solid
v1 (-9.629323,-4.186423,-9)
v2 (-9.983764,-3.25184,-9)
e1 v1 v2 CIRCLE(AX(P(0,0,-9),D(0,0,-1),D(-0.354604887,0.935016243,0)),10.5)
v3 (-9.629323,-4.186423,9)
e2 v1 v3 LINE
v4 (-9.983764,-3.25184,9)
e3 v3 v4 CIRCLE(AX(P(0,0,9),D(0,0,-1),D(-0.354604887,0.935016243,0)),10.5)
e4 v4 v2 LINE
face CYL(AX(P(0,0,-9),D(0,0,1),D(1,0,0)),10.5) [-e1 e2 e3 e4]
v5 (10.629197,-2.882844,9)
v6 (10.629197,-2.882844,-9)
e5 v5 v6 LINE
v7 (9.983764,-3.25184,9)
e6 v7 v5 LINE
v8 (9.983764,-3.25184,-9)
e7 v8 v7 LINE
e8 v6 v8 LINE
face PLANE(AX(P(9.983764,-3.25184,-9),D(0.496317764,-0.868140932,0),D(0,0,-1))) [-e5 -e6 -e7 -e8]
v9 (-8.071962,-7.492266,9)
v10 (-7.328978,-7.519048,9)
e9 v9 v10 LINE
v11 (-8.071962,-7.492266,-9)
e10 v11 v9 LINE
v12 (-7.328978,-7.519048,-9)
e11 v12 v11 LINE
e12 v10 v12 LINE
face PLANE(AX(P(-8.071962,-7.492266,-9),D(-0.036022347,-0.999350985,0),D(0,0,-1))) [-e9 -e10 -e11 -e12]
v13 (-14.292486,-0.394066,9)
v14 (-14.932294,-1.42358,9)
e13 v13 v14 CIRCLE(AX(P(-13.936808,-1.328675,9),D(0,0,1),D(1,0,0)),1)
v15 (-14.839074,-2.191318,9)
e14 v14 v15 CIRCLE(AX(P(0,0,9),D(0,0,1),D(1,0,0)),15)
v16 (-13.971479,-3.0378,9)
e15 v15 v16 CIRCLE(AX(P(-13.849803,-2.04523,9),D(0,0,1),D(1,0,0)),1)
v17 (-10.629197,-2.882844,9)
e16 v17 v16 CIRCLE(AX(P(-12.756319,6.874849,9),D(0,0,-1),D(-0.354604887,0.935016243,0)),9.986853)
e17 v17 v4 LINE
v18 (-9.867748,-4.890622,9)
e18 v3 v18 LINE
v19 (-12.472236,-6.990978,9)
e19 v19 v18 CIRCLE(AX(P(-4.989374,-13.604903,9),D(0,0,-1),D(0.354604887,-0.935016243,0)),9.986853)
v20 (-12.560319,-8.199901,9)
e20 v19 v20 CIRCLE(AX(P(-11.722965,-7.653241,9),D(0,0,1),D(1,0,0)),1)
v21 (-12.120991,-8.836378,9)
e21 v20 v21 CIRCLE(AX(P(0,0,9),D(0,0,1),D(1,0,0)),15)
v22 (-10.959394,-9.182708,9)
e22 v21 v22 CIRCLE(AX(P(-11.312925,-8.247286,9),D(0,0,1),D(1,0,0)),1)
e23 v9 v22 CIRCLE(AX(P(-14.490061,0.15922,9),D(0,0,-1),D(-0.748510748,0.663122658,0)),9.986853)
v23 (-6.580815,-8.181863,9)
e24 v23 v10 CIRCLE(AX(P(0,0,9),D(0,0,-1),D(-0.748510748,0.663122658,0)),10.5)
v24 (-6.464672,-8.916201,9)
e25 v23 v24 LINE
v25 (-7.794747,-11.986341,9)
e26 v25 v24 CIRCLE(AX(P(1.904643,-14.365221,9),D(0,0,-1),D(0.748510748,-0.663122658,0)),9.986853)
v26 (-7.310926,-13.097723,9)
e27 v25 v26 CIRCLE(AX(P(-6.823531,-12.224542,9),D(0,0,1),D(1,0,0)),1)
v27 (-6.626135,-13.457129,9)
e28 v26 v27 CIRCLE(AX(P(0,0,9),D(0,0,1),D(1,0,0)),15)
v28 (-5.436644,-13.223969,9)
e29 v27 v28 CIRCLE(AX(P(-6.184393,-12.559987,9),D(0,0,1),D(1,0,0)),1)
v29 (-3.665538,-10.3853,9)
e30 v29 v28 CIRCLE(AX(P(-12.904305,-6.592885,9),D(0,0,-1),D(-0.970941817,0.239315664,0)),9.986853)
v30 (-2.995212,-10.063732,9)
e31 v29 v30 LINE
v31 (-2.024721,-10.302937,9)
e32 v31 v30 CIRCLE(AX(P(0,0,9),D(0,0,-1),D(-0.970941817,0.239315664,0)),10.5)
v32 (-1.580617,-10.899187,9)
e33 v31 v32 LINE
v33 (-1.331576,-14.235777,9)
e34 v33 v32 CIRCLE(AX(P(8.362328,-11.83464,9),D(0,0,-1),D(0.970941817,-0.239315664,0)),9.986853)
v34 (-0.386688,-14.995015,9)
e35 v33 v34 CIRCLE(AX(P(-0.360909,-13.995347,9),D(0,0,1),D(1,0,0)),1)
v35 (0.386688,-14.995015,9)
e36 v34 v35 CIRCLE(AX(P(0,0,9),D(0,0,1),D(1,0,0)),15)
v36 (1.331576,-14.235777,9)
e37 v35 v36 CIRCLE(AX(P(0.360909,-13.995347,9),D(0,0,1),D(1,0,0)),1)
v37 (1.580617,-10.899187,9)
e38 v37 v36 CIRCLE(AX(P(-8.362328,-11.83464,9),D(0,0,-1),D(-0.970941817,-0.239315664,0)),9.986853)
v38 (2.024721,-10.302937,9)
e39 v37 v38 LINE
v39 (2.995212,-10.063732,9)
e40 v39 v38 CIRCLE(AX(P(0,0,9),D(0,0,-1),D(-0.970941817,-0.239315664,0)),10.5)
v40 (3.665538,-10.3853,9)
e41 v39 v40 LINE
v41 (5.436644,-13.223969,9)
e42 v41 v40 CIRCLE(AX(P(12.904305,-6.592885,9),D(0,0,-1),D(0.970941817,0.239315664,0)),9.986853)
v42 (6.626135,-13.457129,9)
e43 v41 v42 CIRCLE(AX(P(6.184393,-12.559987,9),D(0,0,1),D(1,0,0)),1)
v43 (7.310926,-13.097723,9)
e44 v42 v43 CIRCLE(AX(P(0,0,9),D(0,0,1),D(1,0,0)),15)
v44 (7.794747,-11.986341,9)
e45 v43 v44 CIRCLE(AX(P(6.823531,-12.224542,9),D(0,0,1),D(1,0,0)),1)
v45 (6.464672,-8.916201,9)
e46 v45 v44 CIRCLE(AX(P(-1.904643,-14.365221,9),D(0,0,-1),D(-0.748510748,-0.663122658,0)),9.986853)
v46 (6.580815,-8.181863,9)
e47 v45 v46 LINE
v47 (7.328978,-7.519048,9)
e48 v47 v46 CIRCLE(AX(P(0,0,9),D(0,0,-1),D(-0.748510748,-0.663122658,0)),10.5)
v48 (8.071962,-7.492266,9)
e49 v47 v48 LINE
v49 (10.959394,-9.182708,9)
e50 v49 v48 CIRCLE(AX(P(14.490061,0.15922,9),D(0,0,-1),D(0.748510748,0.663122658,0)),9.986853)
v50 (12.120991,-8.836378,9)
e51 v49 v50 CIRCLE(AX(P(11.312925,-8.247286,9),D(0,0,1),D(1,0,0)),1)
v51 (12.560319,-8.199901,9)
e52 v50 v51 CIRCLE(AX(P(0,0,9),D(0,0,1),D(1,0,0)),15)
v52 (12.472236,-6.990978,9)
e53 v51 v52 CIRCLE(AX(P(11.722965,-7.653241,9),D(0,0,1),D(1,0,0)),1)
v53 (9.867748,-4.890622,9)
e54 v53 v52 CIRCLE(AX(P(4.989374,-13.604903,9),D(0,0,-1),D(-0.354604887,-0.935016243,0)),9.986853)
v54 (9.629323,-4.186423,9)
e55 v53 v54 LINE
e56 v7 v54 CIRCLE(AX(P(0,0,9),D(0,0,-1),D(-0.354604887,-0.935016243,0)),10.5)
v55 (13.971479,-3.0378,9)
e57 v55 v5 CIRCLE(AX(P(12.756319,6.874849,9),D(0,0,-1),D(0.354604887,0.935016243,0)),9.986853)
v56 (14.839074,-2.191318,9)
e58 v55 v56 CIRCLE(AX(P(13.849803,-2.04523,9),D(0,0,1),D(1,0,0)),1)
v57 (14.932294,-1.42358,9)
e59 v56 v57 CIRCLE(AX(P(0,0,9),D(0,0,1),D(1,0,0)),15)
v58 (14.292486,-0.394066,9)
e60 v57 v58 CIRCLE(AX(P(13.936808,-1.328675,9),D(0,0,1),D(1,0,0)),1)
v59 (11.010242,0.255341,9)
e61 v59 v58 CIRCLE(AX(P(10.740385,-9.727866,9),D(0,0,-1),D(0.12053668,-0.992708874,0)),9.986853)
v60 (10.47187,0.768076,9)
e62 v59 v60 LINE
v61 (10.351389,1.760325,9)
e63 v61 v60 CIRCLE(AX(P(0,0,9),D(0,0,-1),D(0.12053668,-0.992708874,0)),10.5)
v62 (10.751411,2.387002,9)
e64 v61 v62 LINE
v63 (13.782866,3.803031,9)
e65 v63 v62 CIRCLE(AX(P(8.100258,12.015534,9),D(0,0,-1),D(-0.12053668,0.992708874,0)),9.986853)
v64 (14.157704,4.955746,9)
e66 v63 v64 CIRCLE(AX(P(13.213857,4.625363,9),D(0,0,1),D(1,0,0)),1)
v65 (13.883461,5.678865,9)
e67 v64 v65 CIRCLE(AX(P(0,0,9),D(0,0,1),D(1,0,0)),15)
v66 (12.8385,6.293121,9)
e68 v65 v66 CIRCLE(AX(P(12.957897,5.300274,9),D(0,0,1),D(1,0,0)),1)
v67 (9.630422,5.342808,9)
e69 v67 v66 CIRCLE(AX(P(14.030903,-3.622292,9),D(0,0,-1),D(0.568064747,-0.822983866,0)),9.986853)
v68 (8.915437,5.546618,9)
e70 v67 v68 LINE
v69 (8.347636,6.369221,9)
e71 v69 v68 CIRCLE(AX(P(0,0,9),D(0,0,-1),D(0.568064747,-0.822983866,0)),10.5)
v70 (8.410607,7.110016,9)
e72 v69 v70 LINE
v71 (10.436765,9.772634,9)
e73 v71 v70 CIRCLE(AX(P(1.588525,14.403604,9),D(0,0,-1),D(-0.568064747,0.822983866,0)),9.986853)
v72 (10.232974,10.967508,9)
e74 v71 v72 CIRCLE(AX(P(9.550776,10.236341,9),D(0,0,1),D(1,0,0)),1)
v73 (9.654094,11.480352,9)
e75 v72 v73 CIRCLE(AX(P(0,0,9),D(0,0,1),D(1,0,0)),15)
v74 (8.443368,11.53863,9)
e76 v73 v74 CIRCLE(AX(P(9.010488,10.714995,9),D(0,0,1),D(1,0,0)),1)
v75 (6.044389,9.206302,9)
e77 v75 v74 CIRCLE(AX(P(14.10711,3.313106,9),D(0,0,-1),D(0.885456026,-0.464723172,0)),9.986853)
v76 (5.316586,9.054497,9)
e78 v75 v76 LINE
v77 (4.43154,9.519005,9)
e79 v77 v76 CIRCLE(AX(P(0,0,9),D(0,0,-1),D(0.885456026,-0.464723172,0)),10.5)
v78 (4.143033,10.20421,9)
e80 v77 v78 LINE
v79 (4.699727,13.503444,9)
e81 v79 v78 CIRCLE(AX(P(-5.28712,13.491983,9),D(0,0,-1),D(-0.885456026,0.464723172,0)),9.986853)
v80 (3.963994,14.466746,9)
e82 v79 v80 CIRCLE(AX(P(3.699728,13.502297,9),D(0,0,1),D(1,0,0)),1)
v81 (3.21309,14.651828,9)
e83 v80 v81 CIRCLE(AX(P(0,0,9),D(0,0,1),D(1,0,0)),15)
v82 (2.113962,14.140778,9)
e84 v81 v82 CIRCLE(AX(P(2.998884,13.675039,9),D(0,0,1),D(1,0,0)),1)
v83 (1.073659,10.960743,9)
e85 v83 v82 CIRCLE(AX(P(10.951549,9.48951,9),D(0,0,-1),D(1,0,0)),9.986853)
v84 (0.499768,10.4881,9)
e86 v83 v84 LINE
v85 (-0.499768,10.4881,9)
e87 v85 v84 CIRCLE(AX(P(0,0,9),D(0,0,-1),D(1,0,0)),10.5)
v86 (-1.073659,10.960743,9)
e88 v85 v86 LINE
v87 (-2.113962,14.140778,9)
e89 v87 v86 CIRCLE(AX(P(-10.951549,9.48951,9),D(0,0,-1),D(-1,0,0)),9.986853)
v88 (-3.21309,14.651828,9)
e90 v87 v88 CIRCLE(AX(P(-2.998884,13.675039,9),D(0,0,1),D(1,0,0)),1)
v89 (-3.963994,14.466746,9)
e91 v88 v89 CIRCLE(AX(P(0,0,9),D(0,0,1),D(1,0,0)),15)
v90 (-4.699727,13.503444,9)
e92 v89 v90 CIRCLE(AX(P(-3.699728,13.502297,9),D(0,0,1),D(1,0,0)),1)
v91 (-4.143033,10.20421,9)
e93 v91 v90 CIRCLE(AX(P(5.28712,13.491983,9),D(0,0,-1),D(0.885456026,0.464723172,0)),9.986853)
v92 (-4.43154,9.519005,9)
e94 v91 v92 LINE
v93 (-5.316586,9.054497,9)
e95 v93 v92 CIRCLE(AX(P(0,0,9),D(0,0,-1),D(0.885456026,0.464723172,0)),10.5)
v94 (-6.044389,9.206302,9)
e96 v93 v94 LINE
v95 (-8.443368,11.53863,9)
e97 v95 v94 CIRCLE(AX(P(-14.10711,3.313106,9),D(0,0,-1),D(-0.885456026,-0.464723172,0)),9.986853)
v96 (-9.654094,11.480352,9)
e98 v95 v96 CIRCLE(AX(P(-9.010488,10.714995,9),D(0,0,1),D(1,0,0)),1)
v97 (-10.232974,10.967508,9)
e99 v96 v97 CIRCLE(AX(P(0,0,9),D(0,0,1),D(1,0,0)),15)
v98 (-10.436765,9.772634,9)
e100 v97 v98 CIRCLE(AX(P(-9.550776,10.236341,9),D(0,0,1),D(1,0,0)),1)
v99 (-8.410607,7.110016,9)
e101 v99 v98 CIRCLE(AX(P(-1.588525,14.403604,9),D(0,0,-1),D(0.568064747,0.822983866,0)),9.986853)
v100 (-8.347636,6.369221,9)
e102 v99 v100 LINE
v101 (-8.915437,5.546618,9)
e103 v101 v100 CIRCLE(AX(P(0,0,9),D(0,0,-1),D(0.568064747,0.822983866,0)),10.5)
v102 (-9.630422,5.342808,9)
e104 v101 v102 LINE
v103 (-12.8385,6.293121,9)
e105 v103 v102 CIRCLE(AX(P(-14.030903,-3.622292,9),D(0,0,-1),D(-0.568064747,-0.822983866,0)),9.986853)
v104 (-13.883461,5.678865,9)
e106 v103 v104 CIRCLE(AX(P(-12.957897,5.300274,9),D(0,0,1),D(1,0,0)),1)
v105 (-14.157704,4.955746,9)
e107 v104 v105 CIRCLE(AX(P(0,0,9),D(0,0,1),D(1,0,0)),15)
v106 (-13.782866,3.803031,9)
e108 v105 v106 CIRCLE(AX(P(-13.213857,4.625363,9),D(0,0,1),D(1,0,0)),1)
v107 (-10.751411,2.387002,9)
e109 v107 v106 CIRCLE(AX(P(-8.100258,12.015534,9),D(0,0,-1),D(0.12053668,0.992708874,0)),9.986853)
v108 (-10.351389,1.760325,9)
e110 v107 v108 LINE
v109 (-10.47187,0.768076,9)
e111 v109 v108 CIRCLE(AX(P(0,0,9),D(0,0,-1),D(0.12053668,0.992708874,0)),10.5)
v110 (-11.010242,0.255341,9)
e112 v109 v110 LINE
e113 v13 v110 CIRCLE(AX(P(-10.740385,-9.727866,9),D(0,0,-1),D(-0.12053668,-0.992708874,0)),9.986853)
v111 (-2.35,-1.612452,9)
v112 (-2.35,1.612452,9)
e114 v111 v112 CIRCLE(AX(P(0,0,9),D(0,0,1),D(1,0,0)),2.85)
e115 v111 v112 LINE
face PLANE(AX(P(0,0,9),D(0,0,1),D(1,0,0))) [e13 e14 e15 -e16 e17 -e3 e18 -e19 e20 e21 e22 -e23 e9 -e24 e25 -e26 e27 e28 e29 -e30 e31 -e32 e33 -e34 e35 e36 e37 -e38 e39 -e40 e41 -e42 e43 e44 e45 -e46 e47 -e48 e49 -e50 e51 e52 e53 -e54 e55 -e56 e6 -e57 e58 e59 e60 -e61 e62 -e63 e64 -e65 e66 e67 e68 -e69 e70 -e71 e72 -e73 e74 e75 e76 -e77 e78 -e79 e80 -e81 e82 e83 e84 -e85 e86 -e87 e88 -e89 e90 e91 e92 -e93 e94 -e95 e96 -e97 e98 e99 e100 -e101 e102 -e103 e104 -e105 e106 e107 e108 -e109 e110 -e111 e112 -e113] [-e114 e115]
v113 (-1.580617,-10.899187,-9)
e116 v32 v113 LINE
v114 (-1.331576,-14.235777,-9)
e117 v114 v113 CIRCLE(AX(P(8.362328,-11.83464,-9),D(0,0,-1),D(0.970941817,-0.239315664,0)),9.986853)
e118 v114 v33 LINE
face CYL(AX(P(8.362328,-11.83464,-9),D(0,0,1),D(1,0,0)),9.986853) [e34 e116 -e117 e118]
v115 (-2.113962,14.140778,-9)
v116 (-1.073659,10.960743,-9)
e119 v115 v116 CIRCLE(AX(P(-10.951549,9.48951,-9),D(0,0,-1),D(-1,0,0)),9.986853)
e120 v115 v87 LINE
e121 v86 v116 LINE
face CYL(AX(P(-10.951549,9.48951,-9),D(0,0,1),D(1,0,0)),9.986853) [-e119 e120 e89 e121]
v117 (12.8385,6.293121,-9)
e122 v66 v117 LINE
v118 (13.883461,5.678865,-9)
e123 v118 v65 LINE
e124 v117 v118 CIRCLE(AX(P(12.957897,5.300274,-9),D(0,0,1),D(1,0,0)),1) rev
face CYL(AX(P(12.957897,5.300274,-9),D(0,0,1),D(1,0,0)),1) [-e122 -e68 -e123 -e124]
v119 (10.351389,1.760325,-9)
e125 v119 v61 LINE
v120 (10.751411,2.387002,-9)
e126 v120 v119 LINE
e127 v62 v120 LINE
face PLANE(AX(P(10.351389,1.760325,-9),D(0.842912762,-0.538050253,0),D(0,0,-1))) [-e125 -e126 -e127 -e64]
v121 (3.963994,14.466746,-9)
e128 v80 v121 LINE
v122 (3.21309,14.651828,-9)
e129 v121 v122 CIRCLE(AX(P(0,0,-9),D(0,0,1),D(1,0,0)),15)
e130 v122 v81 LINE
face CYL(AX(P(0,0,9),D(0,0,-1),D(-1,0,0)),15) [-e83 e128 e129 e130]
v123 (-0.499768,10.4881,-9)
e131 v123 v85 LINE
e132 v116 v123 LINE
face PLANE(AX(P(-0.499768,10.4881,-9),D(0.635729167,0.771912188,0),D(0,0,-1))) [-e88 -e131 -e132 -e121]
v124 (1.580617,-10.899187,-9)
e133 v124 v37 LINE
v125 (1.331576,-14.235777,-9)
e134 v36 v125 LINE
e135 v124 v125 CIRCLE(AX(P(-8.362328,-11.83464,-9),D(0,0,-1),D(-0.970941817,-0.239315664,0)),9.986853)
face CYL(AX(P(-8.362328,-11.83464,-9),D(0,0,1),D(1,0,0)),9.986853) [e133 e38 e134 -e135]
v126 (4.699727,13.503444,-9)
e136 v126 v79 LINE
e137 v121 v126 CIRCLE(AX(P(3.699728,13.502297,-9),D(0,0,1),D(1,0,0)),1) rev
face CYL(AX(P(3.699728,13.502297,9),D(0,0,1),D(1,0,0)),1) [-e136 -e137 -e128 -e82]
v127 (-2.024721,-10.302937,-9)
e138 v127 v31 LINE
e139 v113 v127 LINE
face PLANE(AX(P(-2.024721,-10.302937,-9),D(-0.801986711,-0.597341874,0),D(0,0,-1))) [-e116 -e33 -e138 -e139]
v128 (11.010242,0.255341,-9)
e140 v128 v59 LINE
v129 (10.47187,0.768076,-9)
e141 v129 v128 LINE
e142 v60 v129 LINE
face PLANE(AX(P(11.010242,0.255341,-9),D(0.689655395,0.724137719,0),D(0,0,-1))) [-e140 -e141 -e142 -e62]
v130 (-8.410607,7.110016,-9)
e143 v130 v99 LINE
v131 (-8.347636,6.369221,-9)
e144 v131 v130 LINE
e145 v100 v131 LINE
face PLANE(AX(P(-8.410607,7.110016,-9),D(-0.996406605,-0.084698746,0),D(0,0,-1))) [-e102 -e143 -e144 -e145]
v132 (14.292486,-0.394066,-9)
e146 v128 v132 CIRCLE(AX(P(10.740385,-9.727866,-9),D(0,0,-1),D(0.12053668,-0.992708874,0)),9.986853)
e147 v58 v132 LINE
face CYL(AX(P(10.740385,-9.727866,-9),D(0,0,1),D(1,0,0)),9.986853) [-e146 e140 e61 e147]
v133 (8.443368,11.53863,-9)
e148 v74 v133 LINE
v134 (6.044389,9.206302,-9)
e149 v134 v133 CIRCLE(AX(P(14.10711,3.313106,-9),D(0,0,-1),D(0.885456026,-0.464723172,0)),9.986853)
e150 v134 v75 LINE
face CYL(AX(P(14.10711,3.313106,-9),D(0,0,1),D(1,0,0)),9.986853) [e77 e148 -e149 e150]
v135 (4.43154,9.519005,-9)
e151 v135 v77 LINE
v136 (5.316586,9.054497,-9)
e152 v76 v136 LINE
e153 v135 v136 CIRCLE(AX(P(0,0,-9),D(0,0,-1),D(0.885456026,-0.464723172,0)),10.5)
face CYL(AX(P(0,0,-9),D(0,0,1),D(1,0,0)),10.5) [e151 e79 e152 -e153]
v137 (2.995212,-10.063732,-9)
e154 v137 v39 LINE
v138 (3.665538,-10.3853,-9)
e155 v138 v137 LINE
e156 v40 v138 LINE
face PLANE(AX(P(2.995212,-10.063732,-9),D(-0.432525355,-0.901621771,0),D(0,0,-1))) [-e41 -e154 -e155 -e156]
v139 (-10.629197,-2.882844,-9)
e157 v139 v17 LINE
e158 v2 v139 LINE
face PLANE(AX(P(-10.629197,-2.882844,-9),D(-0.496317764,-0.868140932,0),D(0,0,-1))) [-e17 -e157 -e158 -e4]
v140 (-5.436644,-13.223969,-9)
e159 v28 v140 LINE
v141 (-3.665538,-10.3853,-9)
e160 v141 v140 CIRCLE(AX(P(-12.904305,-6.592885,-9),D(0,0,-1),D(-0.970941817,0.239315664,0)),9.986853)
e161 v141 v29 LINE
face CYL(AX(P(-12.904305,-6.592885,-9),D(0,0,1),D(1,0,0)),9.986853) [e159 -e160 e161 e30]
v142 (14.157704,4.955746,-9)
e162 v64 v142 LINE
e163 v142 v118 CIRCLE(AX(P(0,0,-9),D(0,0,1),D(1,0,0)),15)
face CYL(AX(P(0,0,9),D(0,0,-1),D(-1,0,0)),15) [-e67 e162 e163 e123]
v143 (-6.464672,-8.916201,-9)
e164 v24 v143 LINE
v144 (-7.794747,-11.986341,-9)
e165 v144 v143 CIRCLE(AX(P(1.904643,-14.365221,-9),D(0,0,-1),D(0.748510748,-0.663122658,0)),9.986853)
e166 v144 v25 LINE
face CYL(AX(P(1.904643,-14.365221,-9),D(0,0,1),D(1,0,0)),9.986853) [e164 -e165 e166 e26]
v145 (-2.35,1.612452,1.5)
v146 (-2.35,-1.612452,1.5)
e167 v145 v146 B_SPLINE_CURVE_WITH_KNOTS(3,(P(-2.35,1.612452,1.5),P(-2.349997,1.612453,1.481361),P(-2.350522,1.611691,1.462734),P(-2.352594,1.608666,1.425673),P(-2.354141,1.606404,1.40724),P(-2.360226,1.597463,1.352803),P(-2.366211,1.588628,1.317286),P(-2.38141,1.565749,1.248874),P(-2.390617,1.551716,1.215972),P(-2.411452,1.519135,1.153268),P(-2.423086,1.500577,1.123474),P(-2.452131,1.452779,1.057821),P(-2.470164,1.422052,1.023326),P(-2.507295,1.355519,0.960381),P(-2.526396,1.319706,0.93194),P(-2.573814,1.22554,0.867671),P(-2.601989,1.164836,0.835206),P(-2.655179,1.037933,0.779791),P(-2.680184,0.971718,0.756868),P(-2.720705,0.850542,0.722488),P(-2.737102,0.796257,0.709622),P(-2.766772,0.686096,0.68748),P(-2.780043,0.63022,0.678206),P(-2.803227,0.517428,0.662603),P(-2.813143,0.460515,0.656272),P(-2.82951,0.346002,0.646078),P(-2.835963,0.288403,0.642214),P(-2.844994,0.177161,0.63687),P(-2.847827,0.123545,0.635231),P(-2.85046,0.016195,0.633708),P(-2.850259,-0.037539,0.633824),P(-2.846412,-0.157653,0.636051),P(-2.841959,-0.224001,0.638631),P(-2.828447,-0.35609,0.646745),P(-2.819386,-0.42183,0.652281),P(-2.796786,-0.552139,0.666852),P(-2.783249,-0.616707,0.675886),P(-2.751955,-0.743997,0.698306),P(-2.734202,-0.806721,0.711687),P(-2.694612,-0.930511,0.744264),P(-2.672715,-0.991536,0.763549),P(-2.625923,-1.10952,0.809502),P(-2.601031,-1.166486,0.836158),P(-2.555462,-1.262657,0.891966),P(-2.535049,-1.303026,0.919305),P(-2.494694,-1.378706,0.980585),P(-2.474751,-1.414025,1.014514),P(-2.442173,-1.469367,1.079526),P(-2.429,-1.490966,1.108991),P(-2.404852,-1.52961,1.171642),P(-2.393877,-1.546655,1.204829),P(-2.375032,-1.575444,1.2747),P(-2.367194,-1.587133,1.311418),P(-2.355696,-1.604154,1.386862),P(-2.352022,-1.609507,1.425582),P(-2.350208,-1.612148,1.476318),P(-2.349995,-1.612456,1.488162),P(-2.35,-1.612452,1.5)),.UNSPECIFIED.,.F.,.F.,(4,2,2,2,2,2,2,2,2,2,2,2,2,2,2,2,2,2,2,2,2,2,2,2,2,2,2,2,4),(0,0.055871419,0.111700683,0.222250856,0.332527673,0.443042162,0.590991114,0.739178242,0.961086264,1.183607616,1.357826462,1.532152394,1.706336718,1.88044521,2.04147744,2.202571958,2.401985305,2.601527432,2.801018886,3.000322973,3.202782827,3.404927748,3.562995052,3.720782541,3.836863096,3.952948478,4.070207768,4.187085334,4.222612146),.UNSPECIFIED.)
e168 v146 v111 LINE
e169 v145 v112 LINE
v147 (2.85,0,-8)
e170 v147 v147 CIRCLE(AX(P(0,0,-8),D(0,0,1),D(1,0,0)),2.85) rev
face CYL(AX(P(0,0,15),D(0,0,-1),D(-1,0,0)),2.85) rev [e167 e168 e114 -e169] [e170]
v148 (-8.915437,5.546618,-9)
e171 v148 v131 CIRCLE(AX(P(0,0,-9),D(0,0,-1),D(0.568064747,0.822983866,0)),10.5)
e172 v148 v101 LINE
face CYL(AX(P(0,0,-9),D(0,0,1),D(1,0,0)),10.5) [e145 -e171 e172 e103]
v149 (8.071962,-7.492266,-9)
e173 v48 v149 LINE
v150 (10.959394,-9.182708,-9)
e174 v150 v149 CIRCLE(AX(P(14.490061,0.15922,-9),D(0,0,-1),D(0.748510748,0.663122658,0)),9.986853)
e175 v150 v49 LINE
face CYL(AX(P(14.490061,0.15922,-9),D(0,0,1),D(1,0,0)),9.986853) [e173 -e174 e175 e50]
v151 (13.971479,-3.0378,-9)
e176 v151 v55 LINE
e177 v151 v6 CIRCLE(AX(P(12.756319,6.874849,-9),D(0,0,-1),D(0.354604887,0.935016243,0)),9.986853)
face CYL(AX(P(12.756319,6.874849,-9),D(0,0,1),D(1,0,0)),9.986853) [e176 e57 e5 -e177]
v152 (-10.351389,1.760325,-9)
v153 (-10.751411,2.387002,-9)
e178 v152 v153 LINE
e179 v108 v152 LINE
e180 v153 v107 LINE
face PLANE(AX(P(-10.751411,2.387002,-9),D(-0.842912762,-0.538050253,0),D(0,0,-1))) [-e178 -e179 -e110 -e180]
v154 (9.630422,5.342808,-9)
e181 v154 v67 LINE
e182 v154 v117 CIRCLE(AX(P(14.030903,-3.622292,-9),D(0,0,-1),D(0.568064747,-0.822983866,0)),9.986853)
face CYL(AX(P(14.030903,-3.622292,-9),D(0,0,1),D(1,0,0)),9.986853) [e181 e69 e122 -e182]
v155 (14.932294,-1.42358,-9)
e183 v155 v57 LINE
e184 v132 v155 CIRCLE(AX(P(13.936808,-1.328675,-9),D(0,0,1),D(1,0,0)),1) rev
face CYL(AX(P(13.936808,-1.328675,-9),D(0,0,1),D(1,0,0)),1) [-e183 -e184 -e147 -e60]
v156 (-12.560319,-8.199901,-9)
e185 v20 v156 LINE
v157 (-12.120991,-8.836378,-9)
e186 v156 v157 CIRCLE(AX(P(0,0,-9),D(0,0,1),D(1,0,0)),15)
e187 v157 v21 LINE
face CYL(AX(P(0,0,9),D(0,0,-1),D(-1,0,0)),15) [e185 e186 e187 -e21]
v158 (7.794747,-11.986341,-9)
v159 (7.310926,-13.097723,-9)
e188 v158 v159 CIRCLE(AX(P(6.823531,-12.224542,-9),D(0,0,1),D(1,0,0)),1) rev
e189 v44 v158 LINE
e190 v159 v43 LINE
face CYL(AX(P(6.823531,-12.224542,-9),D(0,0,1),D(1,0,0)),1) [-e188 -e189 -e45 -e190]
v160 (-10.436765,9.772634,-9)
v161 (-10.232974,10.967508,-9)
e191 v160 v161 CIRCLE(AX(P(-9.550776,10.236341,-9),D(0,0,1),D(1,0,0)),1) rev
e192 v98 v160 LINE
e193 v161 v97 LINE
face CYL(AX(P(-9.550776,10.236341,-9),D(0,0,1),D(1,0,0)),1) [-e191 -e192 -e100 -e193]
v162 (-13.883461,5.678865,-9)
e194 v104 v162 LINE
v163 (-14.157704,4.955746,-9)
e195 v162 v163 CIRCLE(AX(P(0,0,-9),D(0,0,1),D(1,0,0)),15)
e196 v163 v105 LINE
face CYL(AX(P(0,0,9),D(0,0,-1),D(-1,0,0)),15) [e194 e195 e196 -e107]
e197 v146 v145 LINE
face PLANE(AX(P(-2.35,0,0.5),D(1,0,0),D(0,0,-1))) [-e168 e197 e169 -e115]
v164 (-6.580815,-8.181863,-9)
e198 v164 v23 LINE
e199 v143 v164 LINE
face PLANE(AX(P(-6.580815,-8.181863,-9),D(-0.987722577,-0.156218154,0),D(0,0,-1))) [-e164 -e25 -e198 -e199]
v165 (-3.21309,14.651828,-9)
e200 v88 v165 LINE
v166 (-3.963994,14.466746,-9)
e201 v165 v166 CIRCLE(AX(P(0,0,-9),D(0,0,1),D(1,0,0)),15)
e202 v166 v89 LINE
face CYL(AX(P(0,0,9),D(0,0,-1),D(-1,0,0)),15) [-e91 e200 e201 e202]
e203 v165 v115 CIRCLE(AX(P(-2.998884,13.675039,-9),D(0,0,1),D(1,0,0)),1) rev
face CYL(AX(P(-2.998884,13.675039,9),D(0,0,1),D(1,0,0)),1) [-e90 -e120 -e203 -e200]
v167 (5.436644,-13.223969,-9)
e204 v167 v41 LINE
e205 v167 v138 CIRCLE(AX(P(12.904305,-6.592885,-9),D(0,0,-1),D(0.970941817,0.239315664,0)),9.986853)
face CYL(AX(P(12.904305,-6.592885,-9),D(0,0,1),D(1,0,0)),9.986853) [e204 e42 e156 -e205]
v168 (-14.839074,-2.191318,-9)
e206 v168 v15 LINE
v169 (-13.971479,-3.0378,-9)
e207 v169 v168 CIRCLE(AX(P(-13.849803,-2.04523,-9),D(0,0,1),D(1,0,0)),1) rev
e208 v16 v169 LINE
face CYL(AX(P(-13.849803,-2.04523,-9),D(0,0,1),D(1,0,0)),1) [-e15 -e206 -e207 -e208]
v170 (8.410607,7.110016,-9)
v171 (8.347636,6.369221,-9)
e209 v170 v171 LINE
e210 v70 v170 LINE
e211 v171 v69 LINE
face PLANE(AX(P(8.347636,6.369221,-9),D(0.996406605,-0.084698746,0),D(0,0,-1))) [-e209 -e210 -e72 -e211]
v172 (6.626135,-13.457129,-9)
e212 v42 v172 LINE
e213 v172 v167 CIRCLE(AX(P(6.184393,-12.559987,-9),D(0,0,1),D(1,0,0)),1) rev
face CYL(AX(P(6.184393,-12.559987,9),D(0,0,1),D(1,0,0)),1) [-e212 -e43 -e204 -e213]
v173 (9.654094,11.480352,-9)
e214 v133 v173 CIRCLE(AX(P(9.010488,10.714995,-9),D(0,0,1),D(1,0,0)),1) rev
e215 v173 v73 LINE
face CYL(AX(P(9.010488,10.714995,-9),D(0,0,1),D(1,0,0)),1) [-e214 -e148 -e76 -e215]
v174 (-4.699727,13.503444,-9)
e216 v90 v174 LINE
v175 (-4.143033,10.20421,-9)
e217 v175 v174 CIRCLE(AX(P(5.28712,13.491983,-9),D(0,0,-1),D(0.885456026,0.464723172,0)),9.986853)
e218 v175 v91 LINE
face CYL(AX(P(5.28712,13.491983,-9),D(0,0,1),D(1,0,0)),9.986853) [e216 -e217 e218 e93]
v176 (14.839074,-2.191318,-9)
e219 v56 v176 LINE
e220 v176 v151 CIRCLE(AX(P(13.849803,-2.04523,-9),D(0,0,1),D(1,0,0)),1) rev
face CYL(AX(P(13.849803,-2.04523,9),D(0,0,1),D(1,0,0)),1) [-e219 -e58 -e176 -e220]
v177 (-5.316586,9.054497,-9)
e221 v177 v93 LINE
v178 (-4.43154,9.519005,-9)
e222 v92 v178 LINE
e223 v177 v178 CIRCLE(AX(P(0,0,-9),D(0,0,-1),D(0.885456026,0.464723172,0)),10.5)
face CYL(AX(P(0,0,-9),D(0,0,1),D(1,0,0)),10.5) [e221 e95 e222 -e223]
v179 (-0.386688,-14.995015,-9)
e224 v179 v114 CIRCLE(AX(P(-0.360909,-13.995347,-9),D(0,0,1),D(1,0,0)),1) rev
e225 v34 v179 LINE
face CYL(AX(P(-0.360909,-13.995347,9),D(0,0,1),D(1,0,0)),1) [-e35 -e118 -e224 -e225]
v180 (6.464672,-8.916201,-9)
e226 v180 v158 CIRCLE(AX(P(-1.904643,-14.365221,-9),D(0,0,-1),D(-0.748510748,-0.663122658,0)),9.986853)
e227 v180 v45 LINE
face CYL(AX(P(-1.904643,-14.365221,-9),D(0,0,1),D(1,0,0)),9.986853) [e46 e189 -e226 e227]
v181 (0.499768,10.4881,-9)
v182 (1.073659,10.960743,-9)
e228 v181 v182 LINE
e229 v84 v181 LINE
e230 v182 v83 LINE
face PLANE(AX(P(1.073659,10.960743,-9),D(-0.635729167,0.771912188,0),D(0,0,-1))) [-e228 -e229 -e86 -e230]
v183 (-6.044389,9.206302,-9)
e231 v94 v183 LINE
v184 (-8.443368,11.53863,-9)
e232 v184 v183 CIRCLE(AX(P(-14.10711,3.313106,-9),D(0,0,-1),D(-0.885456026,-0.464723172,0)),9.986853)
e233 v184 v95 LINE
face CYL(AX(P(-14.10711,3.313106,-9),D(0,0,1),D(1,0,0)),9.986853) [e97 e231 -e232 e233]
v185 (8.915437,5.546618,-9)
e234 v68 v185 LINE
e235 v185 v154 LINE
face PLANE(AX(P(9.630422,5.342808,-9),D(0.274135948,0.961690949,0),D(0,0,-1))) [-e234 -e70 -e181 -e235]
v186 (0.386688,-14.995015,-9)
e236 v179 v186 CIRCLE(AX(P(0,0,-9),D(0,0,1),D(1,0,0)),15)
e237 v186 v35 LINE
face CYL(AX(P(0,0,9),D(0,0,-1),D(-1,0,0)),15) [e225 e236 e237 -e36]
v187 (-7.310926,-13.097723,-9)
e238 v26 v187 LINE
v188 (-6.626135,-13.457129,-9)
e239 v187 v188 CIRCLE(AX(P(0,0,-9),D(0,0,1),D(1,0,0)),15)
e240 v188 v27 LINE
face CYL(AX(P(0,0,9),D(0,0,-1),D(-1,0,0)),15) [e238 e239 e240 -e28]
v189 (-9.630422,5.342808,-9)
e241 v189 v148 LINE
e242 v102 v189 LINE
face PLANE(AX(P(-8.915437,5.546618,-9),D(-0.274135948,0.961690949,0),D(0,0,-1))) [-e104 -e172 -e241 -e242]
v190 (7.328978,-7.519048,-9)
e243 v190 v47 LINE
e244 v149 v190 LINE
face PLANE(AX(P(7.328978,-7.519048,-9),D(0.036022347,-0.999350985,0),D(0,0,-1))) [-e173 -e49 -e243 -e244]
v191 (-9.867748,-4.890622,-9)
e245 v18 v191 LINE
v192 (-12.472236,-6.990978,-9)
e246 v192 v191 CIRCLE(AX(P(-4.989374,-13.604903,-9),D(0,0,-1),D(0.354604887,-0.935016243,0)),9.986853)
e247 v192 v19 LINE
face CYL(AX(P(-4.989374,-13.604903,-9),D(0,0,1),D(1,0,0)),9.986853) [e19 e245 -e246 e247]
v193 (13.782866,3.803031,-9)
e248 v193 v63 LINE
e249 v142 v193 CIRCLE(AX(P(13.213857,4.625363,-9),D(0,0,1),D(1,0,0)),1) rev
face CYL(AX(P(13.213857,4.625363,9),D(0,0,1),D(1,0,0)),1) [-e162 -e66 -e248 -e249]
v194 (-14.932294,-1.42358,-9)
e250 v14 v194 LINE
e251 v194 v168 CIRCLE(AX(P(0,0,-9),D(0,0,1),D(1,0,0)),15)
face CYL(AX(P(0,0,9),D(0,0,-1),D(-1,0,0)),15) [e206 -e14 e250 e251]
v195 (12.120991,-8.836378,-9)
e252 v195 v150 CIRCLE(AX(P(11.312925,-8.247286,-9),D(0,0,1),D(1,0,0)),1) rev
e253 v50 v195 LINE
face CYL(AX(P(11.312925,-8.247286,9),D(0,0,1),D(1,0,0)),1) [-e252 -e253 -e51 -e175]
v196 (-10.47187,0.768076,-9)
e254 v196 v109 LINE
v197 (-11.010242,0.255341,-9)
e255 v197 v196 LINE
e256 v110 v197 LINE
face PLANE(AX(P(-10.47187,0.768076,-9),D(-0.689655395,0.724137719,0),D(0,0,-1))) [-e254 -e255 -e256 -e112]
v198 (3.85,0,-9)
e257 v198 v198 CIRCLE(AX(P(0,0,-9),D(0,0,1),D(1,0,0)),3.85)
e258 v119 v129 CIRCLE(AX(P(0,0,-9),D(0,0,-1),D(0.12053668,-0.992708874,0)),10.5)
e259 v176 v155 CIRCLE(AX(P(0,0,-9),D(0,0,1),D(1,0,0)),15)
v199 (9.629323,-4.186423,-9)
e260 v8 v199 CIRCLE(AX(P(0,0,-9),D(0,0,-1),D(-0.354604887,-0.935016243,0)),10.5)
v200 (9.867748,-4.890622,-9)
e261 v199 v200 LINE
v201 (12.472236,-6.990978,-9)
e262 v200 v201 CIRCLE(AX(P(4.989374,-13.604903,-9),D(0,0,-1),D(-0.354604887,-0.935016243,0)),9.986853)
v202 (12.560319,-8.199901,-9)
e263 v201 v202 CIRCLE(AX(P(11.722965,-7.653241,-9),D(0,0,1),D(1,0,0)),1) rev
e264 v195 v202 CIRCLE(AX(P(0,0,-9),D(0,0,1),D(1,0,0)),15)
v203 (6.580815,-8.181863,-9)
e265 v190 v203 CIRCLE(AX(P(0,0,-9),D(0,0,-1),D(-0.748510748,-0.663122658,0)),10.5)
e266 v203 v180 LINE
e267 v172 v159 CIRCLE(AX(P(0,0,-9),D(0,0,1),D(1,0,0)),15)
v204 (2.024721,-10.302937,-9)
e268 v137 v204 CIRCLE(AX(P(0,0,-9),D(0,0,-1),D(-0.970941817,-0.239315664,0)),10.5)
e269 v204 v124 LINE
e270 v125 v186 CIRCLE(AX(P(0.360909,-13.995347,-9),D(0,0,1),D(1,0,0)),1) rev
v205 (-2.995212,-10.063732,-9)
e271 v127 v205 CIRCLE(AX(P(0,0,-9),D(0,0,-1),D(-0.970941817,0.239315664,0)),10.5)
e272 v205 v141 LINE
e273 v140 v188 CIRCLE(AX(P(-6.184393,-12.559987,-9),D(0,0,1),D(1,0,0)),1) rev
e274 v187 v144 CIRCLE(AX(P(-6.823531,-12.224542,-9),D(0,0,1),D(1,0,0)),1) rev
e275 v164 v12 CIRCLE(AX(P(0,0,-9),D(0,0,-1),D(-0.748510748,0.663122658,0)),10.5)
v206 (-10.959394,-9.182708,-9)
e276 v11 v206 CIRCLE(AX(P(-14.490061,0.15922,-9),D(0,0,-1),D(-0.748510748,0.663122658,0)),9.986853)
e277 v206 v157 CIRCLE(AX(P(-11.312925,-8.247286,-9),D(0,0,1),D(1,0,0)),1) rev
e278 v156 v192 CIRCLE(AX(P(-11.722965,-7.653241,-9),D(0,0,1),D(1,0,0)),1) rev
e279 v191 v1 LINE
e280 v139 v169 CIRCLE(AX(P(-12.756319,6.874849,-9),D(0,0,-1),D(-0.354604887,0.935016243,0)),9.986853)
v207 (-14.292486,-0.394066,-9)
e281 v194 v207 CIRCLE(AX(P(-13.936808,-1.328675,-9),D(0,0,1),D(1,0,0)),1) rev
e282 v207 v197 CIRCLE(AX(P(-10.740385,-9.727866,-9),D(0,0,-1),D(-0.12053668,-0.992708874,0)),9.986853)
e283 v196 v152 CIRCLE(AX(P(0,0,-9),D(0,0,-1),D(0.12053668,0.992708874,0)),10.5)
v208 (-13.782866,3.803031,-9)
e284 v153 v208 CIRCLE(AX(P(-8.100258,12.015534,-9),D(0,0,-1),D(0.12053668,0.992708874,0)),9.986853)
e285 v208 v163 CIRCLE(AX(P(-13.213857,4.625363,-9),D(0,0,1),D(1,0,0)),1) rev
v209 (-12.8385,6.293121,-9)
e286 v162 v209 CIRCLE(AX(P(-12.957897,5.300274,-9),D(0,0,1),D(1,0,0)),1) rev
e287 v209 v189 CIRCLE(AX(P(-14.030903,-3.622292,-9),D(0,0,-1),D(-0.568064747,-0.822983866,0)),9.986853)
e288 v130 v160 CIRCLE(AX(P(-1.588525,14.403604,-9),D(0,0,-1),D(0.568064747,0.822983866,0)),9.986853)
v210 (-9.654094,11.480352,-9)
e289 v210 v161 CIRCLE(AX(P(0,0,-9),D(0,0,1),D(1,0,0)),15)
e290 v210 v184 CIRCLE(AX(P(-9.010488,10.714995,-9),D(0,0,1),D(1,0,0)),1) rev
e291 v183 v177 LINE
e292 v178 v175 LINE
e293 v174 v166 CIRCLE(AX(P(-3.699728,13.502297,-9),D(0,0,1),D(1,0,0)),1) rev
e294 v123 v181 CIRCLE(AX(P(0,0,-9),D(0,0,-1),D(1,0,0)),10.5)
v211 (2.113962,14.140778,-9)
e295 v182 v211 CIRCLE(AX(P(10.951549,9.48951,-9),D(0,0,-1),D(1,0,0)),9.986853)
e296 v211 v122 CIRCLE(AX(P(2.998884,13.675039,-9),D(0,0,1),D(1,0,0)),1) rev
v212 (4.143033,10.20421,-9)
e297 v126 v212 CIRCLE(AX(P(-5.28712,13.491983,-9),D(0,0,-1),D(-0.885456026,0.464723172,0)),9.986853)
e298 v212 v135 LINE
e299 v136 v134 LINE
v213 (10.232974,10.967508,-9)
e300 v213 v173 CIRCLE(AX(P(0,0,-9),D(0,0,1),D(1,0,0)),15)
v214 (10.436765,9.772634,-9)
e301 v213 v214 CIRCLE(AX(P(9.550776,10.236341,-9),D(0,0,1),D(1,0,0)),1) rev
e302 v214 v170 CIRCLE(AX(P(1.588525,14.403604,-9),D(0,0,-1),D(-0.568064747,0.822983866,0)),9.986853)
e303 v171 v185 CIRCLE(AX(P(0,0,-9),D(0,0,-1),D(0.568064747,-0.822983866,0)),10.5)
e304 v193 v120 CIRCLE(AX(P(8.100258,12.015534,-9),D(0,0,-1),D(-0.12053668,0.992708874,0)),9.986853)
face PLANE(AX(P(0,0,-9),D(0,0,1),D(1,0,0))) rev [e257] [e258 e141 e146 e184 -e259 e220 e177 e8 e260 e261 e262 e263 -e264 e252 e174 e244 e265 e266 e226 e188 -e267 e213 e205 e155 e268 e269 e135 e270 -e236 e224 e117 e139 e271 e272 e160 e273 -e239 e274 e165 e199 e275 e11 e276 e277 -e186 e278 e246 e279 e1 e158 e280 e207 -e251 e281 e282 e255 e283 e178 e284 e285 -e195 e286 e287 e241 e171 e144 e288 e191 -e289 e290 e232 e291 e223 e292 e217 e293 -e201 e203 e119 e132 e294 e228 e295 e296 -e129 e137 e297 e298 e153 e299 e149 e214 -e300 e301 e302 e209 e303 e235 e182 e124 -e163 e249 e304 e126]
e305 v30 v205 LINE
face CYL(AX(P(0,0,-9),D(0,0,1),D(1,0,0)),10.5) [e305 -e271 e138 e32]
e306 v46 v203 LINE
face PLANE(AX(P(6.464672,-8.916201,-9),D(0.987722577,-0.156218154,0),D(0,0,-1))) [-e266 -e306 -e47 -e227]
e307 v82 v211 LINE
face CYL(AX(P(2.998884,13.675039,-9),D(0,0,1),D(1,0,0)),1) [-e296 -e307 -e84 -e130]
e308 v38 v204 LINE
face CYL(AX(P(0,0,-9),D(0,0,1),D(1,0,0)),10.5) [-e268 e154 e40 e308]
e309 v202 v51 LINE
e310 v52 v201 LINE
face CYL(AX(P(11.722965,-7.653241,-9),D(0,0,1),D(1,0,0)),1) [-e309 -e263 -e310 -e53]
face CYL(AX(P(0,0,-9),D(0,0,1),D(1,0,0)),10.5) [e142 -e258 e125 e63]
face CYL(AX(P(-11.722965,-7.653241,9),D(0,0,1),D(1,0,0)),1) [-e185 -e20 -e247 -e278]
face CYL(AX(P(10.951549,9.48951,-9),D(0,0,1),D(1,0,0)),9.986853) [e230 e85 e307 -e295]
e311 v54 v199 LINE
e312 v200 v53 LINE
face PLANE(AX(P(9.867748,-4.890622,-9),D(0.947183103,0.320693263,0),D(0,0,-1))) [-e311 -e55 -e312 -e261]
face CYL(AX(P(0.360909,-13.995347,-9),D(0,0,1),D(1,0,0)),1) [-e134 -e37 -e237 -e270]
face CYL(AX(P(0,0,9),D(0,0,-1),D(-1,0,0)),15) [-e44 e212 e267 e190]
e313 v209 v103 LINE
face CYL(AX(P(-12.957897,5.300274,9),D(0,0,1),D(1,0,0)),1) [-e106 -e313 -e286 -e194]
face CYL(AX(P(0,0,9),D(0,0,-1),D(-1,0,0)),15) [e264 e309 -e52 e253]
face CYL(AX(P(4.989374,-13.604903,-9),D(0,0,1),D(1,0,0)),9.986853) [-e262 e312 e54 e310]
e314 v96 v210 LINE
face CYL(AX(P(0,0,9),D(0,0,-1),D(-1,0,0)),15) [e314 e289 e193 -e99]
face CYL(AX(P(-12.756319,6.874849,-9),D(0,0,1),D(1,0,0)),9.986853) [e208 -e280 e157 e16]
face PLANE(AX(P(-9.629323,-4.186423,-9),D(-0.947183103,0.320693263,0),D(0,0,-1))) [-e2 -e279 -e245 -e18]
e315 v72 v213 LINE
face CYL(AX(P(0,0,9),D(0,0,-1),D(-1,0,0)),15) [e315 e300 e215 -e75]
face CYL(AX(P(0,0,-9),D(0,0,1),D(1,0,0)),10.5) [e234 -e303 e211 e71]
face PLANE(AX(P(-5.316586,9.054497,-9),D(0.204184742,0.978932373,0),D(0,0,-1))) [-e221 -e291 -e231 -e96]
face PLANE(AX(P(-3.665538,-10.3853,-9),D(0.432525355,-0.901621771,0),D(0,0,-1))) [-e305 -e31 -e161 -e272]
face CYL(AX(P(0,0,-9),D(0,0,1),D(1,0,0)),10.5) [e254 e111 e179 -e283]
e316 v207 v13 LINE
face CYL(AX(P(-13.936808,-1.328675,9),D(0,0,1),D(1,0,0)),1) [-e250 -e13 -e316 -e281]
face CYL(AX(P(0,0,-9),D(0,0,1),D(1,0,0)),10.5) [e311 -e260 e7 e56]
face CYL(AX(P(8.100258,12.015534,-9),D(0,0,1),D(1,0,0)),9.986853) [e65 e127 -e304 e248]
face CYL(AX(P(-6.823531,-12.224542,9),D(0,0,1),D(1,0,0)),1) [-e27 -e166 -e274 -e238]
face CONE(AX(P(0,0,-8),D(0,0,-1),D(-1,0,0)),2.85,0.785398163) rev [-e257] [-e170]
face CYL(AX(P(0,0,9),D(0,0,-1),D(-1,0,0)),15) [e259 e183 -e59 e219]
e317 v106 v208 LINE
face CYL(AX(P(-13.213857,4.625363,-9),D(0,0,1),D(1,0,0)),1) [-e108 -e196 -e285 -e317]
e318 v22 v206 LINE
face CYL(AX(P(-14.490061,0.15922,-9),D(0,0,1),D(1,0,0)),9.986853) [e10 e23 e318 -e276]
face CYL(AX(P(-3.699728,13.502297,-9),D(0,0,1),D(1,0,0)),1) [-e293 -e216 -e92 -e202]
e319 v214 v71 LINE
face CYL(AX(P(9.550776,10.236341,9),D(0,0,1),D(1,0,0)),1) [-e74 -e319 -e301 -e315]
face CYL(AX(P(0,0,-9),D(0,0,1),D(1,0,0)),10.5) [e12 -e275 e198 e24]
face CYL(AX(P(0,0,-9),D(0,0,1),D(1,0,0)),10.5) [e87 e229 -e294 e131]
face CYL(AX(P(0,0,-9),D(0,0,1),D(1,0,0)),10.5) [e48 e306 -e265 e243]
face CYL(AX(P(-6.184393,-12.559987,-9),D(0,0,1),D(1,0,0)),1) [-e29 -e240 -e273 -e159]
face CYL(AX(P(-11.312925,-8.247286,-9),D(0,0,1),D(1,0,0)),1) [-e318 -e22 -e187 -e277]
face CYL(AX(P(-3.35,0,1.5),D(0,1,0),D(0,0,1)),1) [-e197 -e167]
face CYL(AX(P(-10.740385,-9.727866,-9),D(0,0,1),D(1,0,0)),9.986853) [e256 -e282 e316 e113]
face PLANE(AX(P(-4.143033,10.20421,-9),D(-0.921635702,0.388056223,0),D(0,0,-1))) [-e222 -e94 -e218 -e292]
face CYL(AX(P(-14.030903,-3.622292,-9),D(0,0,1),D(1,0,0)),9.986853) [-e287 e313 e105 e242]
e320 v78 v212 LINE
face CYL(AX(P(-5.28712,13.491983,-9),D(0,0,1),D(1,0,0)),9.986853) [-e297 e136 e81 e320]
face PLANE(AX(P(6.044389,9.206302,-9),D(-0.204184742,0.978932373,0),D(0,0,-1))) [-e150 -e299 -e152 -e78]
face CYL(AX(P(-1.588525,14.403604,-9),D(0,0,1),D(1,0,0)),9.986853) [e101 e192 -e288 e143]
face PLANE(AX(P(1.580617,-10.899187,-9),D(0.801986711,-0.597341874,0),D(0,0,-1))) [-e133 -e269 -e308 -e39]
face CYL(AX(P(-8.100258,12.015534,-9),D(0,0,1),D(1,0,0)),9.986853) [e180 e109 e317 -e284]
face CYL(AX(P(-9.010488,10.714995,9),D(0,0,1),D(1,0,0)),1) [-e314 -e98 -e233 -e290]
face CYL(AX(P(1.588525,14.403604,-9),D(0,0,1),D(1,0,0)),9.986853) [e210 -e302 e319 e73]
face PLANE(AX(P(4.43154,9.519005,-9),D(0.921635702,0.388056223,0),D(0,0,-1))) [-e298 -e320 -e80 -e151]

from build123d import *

# Parameters (mm, degrees)
SKETCH1_R           = 15
BOSS_EXTRUDE1_DEPTH = 9
CUT_EXTRUDE1_DEPTH  = 24.043437244
CIRPATTERN1_COUNT   = 13
FILLET1_R           = 1
SKETCH3_R           = 2.85
CUT_EXTRUDE2_DEPTH  = 24
BOSS_EXTRUDE2_DEPTH = 8.5
FILLET3_R           = 1
CHAMFER2_SIZE       = 1


with BuildPart() as part:
    # Sketch1 → Boss-Extrude1 (new, symmetric)
    with BuildSketch(Plane.XY):
        Circle(SKETCH1_R)
    extrude(amount=BOSS_EXTRUDE1_DEPTH, both=True)

    # Sketch2 → Cut-Extrude1 (cut, symmetric)
    with BuildSketch(Plane.XY):
        with BuildLine():
            Line((2.488704723, 14.792104272), (2.488704723, 15.173999235))
            Line((2.488704723, 15.173999235), (-2.614354336, 15.173999235))
            Line((-2.614354336, 15.173999235), (-2.488704723, 14.792104272))
            ThreePointArc((-2.488704723, 14.792104272), (-1.497391845, 12.707607266), (-1.01110734, 10.451203852))
            ThreePointArc((-1.01110734, 10.451203852), (0, 10.5), (1.01110734, 10.451203852))
            ThreePointArc((1.01110734, 10.451203852), (1.497391845, 12.707607266), (2.488704723, 14.792104272))
        make_face()
    cut_extrude1 = extrude(amount=CUT_EXTRUDE1_DEPTH, both=True, mode=Mode.SUBTRACT)

    # CirPattern1: Cut-Extrude1 ×13 about axis
    cirpattern1_axis = Axis((0, 0, 0), (0, 0, 1))
    for i in range(1, CIRPATTERN1_COUNT):
        add(cut_extrude1.rotate(cirpattern1_axis, i * 360 / CIRPATTERN1_COUNT), mode=Mode.SUBTRACT)

    # Fillet1
    fillet1_edges = [part.edges().sort_by_distance(p)[0] for p in [
        (11.67180174, -9.421732544, 0),
        (7.946157272, -12.722365527, 0),
        (14.713364615, -2.918373125, 0),
        (-2.488704723, 14.792104272, 0),
        (12.948350901, -7.572331804, 0),
        (5.956369747, -13.766686582, 0),
        (1.123594773, -14.95785863, 0),
        (2.488704723, 14.792104272, 0),
        (-1.123594773, -14.95785863, 0),
        (-5.956369747, -13.766686582, 0),
        (-12.948350901, -7.572331804, 0),
        (-14.713364615, -2.918373125, 0),
        (-7.946157272, -12.722365527, 0),
        (-11.67180174, -9.421732544, 0),
        (-9.077872212, 11.941199107, 0),
        (-4.670595026, 14.254316613, 0),
        (-13.587408577, 6.354709133, 0),
        (-10.759917741, 10.451036801, 0),
        (-14.984233383, -0.68756812, 0),
        (-14.384272972, 4.253550406, 0),
        (4.670595026, 14.254316613, 0),
        (9.077872212, 11.941199107, 0),
        (10.759917741, 10.451036801, 0),
        (13.587408577, 6.354709133, 0),
        (14.384272972, 4.253550406, 0),
        (14.984233383, -0.68756812, 0),
    ]]
    fillet(fillet1_edges, radius=FILLET1_R)

    # Chamfer1
    # the kernel refuses this chamfer: 0.5 mm, written as the material it adds along each edge
    with BuildSketch(Plane(origin=(7.687254792, -7.152350227, 9), x_dir=(-0.6988462718759633, -0.7152718981513725, 0), z_dir=(0, 0, -1)), Plane(origin=(3.482863191, -9.905537037, 9), x_dir=(-0.9512010678205252, -0.3085717559613855, 0), z_dir=(0, 0, -1)), Plane(origin=(-1.519410394, -10.389484687, 9), x_dir=(-0.9856471623429421, 0.16881845682657493, 0), z_dir=(0, 0, -1)), Plane(origin=(-9.413501753, -4.651449748, 9), x_dir=(-0.42097653940929197, 0.9070715259928386, 0), z_dir=(0, 0, -1)), Plane(origin=(-6.173605368, -8.493326601, 9), x_dir=(-0.7942933703085662, 0.6075343956385179, 0), z_dir=(0, 0, -1)), Plane(origin=(-10.496878331, 0.256018188, 9), x_dir=(0.048780943351376956, 0.998809501139106, 0), z_dir=(0, 0, -1))) as chamfer1_piece_1:
        with BuildLine():
            Line((0.512668458, 0), (-0.025719054, -0.512719416))
            ThreePointArc((-0.025719054, -0.512719416), (-0.009930751, -0.26377362), (0, 0))
            ThreePointArc((0, 0), (0.263582733, -0.00312688), (0.512668458, 0))
        make_face()
    extrude(amount=18)
    with BuildSketch(Plane(origin=(6.173605368, -8.493326601, 9), x_dir=(0.5669781411868423, -0.8237328374031918, 0), z_dir=(0, 0, -1)), Plane(origin=(9.413501753, -4.651449748, 9), x_dir=(0.8848419486421701, -0.4658913241552447, 0), z_dir=(0, 0, -1)), Plane(origin=(1.519410394, -10.389484687, 9), x_dir=(0.11922647441292282, -0.9928670846589006, 0), z_dir=(0, 0, -1)), Plane(origin=(-3.482863191, -9.905537037, 9), x_dir=(-0.3558385408142222, -0.934547448164728, 0), z_dir=(0, 0, -1)), Plane(origin=(-10.130588961, -2.760646175, 9), x_dir=(-0.971256802316475, -0.23803408149669583, 0), z_dir=(0, 0, -1)), Plane(origin=(-7.687254792, -7.152350227, 9), x_dir=(-0.7493852346601237, -0.6621342538136743, 0), z_dir=(0, 0, -1)), Plane(origin=(-10.253127286, 2.263488646, 9), x_dir=(-0.9706251414754602, 0.24059683026952544, 0), z_dir=(0, 0, -1))) as chamfer1_piece_2:
        with BuildLine():
            Line((0.513364071, 0), (-0.025684204, -0.512024677))
            ThreePointArc((-0.025684204, -0.512024677), (-0.010082291, -0.263408394), (0, 0))
            ThreePointArc((0, 0), (0.263939908, -0.003296528), (0.513364071, 0))
        make_face()
    extrude(amount=18)
    with BuildSketch(Plane(origin=(-1.01110734, 10.451203852, 9), x_dir=(-0.12184667616261032, 0.9925489345660113, 0), z_dir=(0, 0, -1)), Plane(origin=(10.130588961, -2.760646175, 9), x_dir=(0.9712568023164747, -0.2380340814966975, 0), z_dir=(0, 0, -1)), Plane(origin=(-5.752207693, 8.784196415, 9), x_dir=(-0.569150362894187, 0.822233461017864, 0), z_dir=(0, 0, -1)), Plane(origin=(-9.175546584, 5.104835441, 9), x_dir=(-0.8860685604921126, 0.46355421053792145, 0), z_dir=(0, 0, -1)), Plane(origin=(3.961625519, 9.723966436, 9), x_dir=(0.35337061566617867, 0.9354834087164272, 0), z_dir=(0, 0, -1)), Plane(origin=(8.026797714, 6.769085497, 9), x_dir=(0.7476349580234212, 0.664109907727115, 0), z_dir=(0, 0, -1)), Plane(origin=(10.253127286, 2.263488646, 9), x_dir=(0.9706251414754612, 0.24059683026952128, 0), z_dir=(0, 0, -1))) as chamfer1_piece_3:
        with BuildLine():
            Line((0.513364071, 0), (-0.025684204, 0.512024677))
            ThreePointArc((-0.025684204, 0.512024677), (-0.010082291, 0.263408394), (0, 0))
            ThreePointArc((0, 0), (0.263939908, 0.003296528), (0.513364071, 0))
        make_face()
    extrude(amount=18)
    with BuildSketch(Plane(origin=(1.01110734, 10.451203852, 9), x_dir=(-0.9974069482855394, 0.07196790612298887, 0), z_dir=(0, 0, -1)), Plane(origin=(-3.961625519, 9.723966436, 9), x_dir=(-0.916605146006636, -0.39979370469550085, 0), z_dir=(0, 0, -1)), Plane(origin=(-8.026797714, 6.769085497, 9), x_dir=(-0.6258201510670891, -0.7799673958047002, 0), z_dir=(0, 0, -1)), Plane(origin=(5.752207693, 8.784196415, 9), x_dir=(-0.8497148387689841, 0.5272425369560002, 0), z_dir=(0, 0, -1)), Plane(origin=(9.175546584, 5.104835441, 9), x_dir=(-0.5073632998643495, 0.8617322565337555, 0), z_dir=(0, 0, -1)), Plane(origin=(10.496878331, 0.256018188, 9), x_dir=(-0.04878094335137992, 0.9988095011391058, 0), z_dir=(0, 0, -1))) as chamfer1_piece_4:
        with BuildLine():
            Line((0.512668458, 0), (-0.025719054, 0.512719416))
            ThreePointArc((-0.025719054, 0.512719416), (-0.009930751, 0.26377362), (0, 0))
            ThreePointArc((0, 0), (0.263582733, 0.00312688), (0.512668458, 0))
        make_face()
    extrude(amount=18)

    # Sketch3 → Cut-Extrude2 (cut)
    with BuildSketch(Plane(origin=(0, 0, -9), x_dir=(-1, 0, 0), z_dir=(0, 0, -1))):
        Circle(SKETCH3_R)
    extrude(amount=-CUT_EXTRUDE2_DEPTH, mode=Mode.SUBTRACT)

    # Sketch5 → Boss-Extrude2 (add)
    with BuildSketch(Plane.XY.offset(9)):
        Polygon((-2.35, 0), (-2.35, 1.61245155), (-2.85, 1.61245155), (-2.85, -1.61245155), (-2.35, -1.61245155), align=None)
    extrude(amount=-BOSS_EXTRUDE2_DEPTH)

    # Fillet3
    # the kernel refuses this fillet: 1 mm, written as the material it takes off along each edge
    with BuildSketch(Plane(origin=(-2.35, -4.11245155, 0.5), x_dir=(-1, 0, 0), z_dir=(0, 1, 0))) as fillet3_piece_1_section:
        with BuildLine():
            CenterArc((FILLET3_R, FILLET3_R), FILLET3_R, 180, 90)
            Line((0, FILLET3_R), (0, 0))
            Line((0, 0), (FILLET3_R, 0))
        make_face()
    fillet3_piece_1 = extrude(amount=8.224903099, mode=Mode.PRIVATE)
    fillet3_piece_1 = fillet3_piece_1 & Plane(origin=(0, 0, 0.5), x_dir=(-1, 0, 0), z_dir=(0, 0, -1)) * Cylinder(2.85, 21, mode=Mode.PRIVATE)
    add(fillet3_piece_1, mode=Mode.SUBTRACT)

    # Chamfer2
    chamfer2_edges = [part.edges().sort_by_distance(p)[0] for p in [
        (2.85, 0, -9),
    ]]
    chamfer(chamfer2_edges, length=CHAMFER2_SIZE)


solid = part.part
